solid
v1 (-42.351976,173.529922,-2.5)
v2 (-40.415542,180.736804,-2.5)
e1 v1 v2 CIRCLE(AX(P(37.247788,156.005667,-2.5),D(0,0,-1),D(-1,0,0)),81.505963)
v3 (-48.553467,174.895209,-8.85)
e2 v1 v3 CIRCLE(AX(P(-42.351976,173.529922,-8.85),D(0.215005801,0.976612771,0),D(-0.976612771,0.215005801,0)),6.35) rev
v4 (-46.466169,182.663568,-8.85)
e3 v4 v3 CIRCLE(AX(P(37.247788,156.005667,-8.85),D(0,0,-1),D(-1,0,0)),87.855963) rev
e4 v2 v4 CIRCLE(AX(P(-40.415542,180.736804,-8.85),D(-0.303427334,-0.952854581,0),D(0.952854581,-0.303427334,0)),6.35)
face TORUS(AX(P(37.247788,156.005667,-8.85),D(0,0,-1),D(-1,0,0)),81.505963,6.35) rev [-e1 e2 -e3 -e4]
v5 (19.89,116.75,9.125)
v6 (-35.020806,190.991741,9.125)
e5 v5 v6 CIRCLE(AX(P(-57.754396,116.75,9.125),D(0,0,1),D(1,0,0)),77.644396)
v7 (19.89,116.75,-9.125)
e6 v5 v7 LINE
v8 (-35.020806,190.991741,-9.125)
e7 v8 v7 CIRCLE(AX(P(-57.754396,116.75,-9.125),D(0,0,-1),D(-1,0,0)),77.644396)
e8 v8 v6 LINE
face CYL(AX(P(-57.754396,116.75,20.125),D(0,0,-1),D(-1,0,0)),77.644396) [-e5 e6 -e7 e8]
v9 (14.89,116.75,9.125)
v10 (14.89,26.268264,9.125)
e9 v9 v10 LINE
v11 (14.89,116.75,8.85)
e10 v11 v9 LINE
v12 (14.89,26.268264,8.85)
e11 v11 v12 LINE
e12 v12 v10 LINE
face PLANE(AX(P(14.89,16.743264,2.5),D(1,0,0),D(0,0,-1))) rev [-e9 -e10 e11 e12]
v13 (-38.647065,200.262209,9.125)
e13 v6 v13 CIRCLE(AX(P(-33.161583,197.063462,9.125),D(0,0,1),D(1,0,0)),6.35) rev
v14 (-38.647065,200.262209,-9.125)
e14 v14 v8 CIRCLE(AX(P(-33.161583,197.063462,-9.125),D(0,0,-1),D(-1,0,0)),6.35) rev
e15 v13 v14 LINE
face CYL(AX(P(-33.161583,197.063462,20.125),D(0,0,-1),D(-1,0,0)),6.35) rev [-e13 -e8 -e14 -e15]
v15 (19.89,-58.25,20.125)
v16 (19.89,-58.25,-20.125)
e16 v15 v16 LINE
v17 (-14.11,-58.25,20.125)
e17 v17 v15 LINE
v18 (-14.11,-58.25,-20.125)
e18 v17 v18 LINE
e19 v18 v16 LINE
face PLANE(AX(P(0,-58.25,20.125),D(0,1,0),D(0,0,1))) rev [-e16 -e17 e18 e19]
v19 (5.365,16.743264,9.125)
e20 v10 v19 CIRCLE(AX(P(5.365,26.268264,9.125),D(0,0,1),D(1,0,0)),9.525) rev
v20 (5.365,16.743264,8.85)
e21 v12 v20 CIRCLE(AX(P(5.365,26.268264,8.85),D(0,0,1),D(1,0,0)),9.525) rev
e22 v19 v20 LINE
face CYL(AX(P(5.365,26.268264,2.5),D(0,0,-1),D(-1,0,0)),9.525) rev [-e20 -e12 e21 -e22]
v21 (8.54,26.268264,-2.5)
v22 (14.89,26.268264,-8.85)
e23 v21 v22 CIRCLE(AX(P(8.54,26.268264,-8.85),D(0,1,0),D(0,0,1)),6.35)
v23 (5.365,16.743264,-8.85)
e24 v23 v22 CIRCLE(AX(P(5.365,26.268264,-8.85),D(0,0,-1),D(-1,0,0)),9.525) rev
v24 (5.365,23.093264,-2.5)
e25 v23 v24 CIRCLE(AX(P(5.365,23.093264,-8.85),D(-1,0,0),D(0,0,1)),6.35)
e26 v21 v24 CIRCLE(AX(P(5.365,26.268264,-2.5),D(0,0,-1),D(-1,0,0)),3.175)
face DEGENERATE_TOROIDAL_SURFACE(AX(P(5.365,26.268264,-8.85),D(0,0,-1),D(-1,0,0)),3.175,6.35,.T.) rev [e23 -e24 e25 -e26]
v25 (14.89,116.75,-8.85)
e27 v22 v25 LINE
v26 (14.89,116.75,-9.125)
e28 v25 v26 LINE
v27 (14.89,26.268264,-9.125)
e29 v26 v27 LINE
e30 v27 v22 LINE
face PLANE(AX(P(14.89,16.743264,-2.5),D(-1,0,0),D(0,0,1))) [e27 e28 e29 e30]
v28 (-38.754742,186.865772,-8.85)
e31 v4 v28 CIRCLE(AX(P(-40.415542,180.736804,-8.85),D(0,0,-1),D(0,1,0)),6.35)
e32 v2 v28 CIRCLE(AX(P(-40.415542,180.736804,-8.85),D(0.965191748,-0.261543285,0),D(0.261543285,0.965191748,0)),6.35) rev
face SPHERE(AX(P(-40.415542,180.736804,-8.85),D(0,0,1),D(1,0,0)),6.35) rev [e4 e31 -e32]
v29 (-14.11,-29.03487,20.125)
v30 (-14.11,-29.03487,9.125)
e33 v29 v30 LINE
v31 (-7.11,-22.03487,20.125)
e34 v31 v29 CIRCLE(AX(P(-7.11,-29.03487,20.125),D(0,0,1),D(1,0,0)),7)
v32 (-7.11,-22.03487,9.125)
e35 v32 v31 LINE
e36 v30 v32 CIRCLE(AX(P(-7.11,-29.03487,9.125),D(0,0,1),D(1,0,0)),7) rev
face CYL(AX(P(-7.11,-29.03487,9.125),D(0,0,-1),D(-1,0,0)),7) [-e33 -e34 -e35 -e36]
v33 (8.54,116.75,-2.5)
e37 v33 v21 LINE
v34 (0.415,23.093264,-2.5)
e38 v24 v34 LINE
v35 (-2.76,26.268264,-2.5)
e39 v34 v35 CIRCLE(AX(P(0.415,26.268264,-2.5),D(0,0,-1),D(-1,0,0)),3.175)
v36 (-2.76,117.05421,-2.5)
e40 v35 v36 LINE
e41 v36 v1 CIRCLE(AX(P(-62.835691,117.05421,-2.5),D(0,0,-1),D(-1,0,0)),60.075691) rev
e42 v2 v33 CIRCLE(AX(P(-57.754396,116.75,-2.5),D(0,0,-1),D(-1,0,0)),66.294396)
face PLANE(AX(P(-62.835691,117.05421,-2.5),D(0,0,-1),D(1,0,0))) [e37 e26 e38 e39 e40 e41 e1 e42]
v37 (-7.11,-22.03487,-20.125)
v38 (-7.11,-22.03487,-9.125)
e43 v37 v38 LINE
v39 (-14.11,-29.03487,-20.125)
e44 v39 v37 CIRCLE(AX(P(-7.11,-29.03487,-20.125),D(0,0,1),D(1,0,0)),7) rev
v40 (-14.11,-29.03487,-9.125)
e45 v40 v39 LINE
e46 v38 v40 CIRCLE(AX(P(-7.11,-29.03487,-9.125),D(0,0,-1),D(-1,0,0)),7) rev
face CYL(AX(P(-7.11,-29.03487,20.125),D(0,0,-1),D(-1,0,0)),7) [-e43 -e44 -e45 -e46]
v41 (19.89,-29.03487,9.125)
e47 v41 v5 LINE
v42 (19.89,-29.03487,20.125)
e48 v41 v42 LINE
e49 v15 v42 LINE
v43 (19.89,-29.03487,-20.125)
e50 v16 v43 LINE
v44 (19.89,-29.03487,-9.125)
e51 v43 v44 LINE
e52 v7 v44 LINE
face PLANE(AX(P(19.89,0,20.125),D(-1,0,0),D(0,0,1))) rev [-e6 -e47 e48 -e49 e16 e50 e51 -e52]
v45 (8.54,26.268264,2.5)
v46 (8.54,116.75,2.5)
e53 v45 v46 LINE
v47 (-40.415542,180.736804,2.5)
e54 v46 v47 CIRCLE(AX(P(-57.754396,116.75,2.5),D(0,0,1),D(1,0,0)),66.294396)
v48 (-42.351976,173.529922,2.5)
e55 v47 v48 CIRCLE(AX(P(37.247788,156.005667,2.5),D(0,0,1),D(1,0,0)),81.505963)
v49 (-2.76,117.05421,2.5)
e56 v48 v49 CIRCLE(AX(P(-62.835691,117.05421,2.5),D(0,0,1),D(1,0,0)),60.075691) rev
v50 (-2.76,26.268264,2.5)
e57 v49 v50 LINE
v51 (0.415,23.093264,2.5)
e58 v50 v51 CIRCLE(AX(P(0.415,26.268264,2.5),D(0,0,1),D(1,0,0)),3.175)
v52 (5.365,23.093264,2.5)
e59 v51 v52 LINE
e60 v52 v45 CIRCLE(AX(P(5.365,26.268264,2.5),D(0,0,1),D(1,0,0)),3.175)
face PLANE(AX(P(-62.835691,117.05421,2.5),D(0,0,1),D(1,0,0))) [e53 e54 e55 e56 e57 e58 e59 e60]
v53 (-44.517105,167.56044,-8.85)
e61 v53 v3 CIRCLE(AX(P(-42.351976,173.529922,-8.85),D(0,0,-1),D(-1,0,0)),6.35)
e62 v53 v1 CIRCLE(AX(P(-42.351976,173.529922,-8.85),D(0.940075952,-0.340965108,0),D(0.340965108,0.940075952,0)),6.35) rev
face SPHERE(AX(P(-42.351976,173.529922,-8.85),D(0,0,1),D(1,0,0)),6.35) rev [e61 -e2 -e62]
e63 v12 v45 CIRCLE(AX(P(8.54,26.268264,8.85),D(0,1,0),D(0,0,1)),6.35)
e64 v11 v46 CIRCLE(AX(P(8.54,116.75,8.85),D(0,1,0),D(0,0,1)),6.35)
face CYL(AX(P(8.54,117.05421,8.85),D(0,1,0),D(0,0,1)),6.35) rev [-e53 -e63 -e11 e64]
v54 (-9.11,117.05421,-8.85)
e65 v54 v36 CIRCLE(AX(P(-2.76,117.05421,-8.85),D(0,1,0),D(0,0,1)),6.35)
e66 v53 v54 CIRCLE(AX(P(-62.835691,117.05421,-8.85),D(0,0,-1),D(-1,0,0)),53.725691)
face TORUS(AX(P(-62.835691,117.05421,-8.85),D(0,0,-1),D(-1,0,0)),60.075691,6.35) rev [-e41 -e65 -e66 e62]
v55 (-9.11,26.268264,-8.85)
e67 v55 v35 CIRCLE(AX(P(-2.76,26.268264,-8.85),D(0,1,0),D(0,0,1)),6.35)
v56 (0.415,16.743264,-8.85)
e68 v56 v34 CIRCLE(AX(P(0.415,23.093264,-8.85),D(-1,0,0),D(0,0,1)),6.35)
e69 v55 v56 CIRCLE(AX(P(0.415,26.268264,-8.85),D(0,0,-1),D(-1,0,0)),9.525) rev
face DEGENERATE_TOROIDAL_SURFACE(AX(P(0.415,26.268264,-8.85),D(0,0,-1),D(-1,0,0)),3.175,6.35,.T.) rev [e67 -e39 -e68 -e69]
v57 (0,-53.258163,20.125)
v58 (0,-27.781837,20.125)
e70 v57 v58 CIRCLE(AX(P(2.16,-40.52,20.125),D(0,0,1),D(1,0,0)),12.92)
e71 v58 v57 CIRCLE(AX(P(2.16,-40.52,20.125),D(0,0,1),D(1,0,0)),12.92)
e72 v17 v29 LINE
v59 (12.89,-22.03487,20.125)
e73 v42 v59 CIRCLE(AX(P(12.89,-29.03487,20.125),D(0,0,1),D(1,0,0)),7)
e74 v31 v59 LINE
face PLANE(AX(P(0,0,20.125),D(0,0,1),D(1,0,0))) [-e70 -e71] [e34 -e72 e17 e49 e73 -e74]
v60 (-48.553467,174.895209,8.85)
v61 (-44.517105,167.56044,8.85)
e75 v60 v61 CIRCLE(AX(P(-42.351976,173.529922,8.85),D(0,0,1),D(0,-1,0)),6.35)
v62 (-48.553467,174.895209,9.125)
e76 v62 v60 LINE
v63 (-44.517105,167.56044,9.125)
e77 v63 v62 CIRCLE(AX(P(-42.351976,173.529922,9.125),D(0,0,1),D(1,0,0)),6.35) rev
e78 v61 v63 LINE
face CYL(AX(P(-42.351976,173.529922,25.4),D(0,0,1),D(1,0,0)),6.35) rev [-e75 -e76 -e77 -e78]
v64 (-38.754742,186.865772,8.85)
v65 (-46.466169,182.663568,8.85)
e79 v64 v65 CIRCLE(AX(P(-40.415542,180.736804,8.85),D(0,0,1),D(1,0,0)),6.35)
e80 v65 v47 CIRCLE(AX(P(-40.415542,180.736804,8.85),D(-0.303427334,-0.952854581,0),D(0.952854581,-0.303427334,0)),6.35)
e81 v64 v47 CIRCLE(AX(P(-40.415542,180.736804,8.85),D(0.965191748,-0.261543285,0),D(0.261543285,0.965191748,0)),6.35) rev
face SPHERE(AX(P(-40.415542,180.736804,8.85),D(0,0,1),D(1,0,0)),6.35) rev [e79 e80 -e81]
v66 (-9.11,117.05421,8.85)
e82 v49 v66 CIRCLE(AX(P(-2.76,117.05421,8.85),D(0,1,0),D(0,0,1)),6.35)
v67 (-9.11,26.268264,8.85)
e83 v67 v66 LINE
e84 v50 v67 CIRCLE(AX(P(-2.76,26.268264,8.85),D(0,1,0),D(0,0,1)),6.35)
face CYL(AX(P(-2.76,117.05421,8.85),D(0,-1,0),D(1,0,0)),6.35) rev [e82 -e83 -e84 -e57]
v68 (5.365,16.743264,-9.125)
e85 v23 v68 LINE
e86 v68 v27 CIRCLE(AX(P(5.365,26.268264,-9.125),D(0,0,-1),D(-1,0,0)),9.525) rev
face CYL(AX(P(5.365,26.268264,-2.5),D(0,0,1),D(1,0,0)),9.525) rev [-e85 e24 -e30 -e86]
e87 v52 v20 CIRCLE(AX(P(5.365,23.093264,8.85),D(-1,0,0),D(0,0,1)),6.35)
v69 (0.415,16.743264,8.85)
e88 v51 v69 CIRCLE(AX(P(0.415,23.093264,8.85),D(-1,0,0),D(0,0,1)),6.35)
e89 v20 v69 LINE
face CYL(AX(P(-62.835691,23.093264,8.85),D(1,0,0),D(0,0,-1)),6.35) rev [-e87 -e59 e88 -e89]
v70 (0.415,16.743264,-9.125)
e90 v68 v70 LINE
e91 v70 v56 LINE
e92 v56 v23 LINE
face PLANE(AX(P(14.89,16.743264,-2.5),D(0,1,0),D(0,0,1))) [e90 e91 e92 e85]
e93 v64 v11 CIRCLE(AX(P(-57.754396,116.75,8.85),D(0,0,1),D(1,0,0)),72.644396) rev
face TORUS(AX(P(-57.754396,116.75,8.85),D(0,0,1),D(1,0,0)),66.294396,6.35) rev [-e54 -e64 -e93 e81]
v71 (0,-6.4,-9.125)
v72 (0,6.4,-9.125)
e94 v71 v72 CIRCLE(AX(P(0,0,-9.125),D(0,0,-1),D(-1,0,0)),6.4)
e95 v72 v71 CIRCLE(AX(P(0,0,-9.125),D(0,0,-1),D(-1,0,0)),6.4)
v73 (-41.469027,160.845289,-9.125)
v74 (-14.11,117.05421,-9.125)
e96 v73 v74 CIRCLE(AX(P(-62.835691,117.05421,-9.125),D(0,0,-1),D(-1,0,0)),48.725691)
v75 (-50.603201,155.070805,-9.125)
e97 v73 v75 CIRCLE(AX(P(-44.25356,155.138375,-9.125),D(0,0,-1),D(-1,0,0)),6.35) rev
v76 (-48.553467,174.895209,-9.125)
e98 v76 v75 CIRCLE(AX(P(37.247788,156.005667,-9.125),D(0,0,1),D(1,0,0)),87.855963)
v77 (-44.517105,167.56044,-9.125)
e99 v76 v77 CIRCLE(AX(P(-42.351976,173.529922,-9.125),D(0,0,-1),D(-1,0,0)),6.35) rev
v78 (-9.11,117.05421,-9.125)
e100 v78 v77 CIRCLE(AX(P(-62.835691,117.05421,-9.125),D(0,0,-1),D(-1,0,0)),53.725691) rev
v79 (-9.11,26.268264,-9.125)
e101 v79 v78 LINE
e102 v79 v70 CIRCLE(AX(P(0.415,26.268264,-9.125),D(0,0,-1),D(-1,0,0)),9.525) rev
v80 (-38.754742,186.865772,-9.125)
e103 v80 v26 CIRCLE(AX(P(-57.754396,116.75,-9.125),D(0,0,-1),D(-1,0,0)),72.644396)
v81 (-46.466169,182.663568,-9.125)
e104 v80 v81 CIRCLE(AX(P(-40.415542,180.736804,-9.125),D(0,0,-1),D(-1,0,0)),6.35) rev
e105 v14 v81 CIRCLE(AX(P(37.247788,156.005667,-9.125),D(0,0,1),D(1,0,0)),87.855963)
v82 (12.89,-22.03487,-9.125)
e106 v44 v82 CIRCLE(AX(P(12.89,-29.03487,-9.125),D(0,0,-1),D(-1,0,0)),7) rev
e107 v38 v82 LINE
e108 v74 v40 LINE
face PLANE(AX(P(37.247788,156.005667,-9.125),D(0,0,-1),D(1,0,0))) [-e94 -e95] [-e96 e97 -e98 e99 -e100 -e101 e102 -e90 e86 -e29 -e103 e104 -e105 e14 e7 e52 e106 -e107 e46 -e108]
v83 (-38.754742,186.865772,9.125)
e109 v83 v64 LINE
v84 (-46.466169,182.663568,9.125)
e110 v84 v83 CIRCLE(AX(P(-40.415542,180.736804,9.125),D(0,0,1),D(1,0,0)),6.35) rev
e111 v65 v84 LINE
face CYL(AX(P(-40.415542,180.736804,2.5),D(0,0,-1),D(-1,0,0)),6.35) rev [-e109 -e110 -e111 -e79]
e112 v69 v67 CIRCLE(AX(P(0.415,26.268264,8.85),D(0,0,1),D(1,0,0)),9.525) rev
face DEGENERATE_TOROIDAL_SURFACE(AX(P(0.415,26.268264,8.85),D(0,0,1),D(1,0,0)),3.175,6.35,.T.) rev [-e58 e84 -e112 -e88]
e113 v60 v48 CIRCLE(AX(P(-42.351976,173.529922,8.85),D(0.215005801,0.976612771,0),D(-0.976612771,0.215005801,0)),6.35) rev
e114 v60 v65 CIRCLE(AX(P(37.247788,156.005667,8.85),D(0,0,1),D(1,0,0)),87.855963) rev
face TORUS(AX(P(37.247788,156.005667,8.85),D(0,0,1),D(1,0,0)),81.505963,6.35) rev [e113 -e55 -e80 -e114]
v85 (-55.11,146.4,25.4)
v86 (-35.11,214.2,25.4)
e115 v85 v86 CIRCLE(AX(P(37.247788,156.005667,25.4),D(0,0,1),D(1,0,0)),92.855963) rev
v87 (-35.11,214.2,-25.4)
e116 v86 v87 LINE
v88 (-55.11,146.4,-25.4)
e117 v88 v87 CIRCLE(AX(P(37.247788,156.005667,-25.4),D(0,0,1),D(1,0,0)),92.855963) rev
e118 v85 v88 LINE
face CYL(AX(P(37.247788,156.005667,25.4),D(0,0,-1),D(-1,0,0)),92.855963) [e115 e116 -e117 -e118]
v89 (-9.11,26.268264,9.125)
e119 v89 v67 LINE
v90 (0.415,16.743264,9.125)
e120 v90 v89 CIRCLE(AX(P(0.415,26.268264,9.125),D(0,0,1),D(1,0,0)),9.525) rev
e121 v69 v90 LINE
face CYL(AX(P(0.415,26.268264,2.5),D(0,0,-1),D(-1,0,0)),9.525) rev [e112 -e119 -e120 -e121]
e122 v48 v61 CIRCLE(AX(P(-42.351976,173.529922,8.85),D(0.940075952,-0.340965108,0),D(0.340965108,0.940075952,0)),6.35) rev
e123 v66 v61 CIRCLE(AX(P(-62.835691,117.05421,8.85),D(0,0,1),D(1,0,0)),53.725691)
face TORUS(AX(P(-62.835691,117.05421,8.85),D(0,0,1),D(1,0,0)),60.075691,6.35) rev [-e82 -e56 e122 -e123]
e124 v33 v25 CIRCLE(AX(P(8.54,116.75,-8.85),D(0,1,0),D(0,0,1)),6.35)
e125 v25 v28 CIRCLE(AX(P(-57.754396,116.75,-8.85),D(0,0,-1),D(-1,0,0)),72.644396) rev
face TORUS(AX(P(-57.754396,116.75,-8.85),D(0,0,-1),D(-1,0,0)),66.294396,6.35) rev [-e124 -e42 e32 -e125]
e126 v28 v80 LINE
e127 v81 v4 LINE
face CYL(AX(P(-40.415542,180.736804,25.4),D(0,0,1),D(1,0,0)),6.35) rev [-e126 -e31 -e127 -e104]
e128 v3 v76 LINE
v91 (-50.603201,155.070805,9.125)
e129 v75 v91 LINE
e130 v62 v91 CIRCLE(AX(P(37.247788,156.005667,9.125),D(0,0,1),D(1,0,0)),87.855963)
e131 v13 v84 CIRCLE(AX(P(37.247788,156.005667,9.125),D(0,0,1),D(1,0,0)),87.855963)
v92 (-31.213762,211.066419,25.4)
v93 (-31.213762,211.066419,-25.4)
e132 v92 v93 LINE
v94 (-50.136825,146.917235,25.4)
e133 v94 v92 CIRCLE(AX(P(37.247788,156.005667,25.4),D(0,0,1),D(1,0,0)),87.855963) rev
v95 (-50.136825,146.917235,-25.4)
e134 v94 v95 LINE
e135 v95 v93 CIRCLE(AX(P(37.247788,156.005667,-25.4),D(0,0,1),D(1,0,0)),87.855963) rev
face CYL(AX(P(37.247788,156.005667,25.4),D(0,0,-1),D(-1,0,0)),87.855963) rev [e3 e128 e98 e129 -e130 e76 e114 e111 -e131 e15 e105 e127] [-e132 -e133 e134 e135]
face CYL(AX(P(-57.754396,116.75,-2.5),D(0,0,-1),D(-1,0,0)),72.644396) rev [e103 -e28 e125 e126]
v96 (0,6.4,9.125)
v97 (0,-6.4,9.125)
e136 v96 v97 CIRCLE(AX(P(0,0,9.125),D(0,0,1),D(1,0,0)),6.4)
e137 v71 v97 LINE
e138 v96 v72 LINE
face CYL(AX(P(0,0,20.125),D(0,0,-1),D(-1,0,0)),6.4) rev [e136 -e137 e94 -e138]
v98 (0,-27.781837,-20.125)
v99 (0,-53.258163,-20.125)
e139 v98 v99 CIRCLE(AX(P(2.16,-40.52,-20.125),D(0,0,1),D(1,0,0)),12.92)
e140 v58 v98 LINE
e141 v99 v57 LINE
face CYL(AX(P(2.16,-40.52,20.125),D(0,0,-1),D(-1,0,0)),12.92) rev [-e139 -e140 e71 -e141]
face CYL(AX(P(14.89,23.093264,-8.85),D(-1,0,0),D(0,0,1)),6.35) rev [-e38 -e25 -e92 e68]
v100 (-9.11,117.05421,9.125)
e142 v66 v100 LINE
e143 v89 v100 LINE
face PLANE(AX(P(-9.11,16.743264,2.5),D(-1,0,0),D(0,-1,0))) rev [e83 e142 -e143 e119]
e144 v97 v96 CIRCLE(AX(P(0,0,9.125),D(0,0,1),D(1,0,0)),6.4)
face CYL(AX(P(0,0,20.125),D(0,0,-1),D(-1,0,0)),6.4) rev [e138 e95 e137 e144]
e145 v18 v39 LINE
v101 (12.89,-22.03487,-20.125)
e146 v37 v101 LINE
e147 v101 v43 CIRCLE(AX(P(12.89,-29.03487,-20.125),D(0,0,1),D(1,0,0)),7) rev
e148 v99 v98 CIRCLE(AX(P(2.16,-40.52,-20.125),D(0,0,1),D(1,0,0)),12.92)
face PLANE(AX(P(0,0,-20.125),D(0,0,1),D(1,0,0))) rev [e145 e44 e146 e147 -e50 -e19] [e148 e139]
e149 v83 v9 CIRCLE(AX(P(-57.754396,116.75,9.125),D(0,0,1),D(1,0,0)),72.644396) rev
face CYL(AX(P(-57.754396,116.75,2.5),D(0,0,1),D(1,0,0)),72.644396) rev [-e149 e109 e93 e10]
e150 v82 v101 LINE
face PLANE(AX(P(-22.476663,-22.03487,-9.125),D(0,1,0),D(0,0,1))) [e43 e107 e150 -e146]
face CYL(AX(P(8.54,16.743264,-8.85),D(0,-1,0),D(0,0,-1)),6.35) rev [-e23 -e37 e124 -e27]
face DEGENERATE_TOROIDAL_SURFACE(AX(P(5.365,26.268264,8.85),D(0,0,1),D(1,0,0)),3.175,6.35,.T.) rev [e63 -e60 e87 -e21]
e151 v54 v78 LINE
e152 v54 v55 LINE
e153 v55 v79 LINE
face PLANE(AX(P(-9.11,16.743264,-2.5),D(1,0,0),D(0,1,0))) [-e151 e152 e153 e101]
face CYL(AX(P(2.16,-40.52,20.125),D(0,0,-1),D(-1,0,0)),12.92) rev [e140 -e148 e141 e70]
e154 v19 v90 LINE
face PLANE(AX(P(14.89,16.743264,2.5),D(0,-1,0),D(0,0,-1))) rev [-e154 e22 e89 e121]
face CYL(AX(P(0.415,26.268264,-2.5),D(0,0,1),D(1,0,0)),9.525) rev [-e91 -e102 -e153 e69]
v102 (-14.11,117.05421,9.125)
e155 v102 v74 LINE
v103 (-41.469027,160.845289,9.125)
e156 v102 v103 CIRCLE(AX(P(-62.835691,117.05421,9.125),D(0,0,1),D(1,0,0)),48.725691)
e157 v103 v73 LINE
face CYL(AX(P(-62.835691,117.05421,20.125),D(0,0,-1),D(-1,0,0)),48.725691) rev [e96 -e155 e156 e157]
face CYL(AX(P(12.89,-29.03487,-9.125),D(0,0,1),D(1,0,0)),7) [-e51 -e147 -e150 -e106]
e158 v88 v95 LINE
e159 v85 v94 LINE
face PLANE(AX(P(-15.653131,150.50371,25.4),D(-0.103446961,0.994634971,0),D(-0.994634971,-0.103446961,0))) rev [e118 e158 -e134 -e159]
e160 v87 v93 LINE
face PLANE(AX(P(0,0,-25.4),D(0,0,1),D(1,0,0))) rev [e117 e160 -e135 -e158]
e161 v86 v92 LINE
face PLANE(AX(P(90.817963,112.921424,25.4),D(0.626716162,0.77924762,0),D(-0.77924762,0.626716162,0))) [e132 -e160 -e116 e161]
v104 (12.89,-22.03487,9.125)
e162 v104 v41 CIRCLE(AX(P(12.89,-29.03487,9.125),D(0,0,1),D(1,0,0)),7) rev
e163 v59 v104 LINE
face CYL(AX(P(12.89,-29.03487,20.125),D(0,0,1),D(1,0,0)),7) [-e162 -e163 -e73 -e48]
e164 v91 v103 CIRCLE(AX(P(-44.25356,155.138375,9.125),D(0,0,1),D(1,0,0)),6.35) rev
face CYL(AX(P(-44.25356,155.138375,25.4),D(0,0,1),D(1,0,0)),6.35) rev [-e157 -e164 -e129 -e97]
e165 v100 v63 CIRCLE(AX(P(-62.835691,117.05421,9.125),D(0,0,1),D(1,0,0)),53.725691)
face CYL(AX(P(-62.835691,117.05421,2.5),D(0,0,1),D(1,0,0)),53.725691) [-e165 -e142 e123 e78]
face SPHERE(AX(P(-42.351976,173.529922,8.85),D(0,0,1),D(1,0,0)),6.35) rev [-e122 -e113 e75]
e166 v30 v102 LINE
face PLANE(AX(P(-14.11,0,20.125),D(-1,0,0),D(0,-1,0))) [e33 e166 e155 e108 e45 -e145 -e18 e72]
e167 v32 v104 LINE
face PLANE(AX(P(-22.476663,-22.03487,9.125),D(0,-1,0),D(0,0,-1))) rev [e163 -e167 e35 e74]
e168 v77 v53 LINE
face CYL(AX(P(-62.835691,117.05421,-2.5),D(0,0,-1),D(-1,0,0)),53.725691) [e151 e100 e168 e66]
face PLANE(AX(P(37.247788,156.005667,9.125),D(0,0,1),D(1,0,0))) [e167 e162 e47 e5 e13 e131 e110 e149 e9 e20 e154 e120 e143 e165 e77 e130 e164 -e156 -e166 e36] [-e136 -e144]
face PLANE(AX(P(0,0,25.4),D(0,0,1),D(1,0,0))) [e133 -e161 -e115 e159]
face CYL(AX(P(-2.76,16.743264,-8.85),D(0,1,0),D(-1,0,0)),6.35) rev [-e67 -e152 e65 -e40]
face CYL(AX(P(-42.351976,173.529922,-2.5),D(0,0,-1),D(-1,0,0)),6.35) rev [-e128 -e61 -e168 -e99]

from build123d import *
from build123d.topology import SkipClean

# Parameters (mm, degrees)
SKETCH2_R               = 6.3999999999999995
SKETCH2_R_2             = 12.920000000000002
BOSS_EXTRUDE1_DEPTH     = 20.125
BOSS_EXTRUDE2_DEPTH     = 25.4
CUT_EXTRUDE1_DEPTH      = 17.625
FILLET2_R               = 9.525
FILLET1_R               = 6.35
FILLET2_OF_MIRROR1_R    = 9.525
FILLET1_OF_MIRROR1_R    = 6.35
CUT_EXTRUDE3_REACH      = 230.532
CUT_EXTRUDE3_END_RADIUS = 87.85596312436087
CUT_EXTRUDE4_DEPTH      = 34
FILLET3_R               = 6.35
CUT_EXTRUDE6_DEPTH      = 11
FILLET4_R               = 7


with BuildPart() as part:
    # Sketch2 → Boss-Extrude1 (new, symmetric)
    with BuildSketch(Plane.XY):
        with BuildLine():
            Line((-14.110000000000005, 117.05420999809479), (-14.110000000000003, 39.41472795492869))
            Line((-14.110000000000003, 39.41472795492869), (-14.109999999999992, -58.249999999999986))
            Line((-14.109999999999992, -58.24999999999999), (19.890000000000008, -58.24999999999999))
            Line((19.89000000000001, -58.24999999999999), (19.89000000000001, 39.414727954928686))
            Line((19.89000000000001, 39.41472795492869), (19.89000000000001, 116.74999999999999))
            ThreePointArc((19.890000000000022, 116.74999999999999), (2.3016026864285166, 165.96310053609741), (-42.49516565662927, 192.88020532941604))
            ThreePointArc((-42.49516565662924, 192.88020532941601), (-47.59126491681772, 178.8312081202326), (-50.2324931256602, 164.12173961174625))
            ThreePointArc((-50.23249312566025, 164.12173961174625), (-24.181503081041093, 146.71979128999487), (-14.110000000000007, 117.05420999809479))
        make_face()
        Circle(SKETCH2_R, mode=Mode.SUBTRACT)
        with Locations((2.160000000000005, -40.52)):
            Circle(SKETCH2_R_2, mode=Mode.SUBTRACT)
    extrude(amount=BOSS_EXTRUDE1_DEPTH, both=True)

    # Sketch2<3> → Boss-Extrude2 (add, symmetric)
    with BuildSketch(Plane.XY):
        with BuildLine():
            Line((-55.11000000000002, 146.4), (-50.13682514315135, 146.9172348047148))
            ThreePointArc((-50.13682514315135, 146.9172348047148), (-47.01837422138325, 180.86294224819565), (-31.213761902356293, 211.06641919101017))
            Line((-31.213761902356293, 211.06641919101017), (-35.11000000000003, 214.2))
            ThreePointArc((-35.11000000000003, 214.2), (-51.814073878435075, 182.27760291399264), (-55.11000000000002, 146.4))
        make_face()
    extrude(amount=BOSS_EXTRUDE2_DEPTH, both=True)

    # Sketch3 → Cut-Extrude1 (cut)
    with BuildSketch(Plane.XY.offset(20.125)):
        with BuildLine():
            Line((-9.109999999999992, 16.74326446705436), (-9.110000000000003, 117.05420999809479))
            ThreePointArc((-9.110000000000003, 117.05420999809479), (-20.430838112311193, 150.0432736077851), (-49.62239933784868, 169.12972028140788))
            ThreePointArc((-49.62239933784868, 169.12972028140788), (-47.60047450986274, 178.79694990145757), (-44.50629280792827, 188.17615819065796))
            ThreePointArc((-44.50629280792827, 188.17615819065796), (-1.899187077854016, 163.1978623652425), (14.890000000000011, 116.74999999999999))
            Line((14.890000000000011, 116.74999999999999), (14.890000000000011, 16.74326446705436))
            Line((14.890000000000011, 16.74326446705436), (-9.109999999999992, 16.74326446705436))
        make_face()
    cut_extrude1 = extrude(amount=-CUT_EXTRUDE1_DEPTH, mode=Mode.SUBTRACT)

    # Fillet2
    fillet2_edges = [part.edges().sort_by_distance(p)[0] for p in [
        (14.890000000000011, 16.74326446705436, 11.3125),
        (-9.109999999999992, 16.74326446705436, 11.3125),
    ]]
    fillet(fillet2_edges, radius=FILLET2_R)

    # Fillet1
    fillet1_edges = [part.edges().sort_by_distance(p)[0] for p in [
        (-20.430838112311193, 150.0432736077851, 2.5),
        (-47.600474509862764, 178.79694990145757, 2.5),
        (-49.62239933784869, 169.12972028140788, 11.3125),
        (-1.8991870778540232, 163.1978623652425, 2.5),
        (-44.506292807928276, 188.17615819065796, 11.3125),
        (-9.109999999999998, 71.66123723257456, 2.5),
        (2.8900000000000112, 16.74326446705436, 2.5),
        (14.890000000000011, 71.50913223352717, 2.5),
        (12.100192090801878, 19.53307237625249, 2.5),
        (-6.32019209080186, 19.53307237625249, 2.5),
    ]]
    fillet(fillet1_edges, radius=FILLET1_R)

    # Mirror1: Cut-Extrude1 across plane
    add(cut_extrude1.mirror(Plane.XY), mode=Mode.SUBTRACT)

    # Fillet2 of Mirror1
    fillet2_of_mirror1_edges = [part.edges().sort_by_distance(p)[0] for p in [
        (14.890000000000011, 16.74326446705436, -11.3125),
        (-9.109999999999992, 16.74326446705436, -11.3125),
    ]]
    fillet(fillet2_of_mirror1_edges, radius=FILLET2_OF_MIRROR1_R)

    # Fillet1 of Mirror1
    fillet1_of_mirror1_edges = [part.edges().sort_by_distance(p)[0] for p in [
        (-20.430838112311193, 150.0432736077851, -2.5),
        (-47.600474509862764, 178.79694990145757, -2.5),
        (-49.62239933784869, 169.12972028140788, -11.3125),
        (-1.8991870778540232, 163.1978623652425, -2.5),
        (-44.506292807928276, 188.17615819065796, -11.3125),
        (-9.109999999999998, 71.66123723257456, -2.5),
        (2.8900000000000112, 16.74326446705436, -2.5),
        (14.890000000000011, 71.50913223352717, -2.5),
        (12.100192090801878, 19.53307237625249, -2.5),
        (-6.32019209080186, 19.53307237625249, -2.5),
    ]]
    fillet(fillet1_of_mirror1_edges, radius=FILLET1_OF_MIRROR1_R)

    # Cut-Extrude3: up to this cylinder (the profile starts inside it)
    with SkipClean():  # the faces are left unmerged after this step: merging them gives an invalid solid
        cut_extrude3_end = Plane(origin=(37.24778822370744, 156.0056671906468, 17.416667), z_dir=(0, 0, -1)) * Cylinder(CUT_EXTRUDE3_END_RADIUS, 637.7759262487218, mode=Mode.PRIVATE)
        # Sketch5 → Cut-Extrude3 (cut, up to the surface)
        with BuildSketch(Plane(origin=(19.89000000000001, 0, 0), x_dir=(0, 0, -1), z_dir=(1, 0, 0)), mode=Mode.PRIVATE) as cut_extrude3_sk1:
            Polygon((-20.125, 29.25), (-12, 192.88020532941607), (-20.125, 192.88020532941607), align=None)
        cut_extrude3_tool1 = extrude(cut_extrude3_sk1.sketch, amount=-CUT_EXTRUDE3_REACH, mode=Mode.PRIVATE) & cut_extrude3_end
        cut_extrude3 = cut_extrude3_tool1.solids().sort_by_distance((19.89, 138.336804, 17.416667))[0]
        add(cut_extrude3, mode=Mode.SUBTRACT)

    # Sketch5<2> → Cut-Extrude4 (cut)
    with SkipClean():  # the faces are left unmerged after this step: merging them gives an invalid solid
        with BuildSketch(Plane(origin=(19.89000000000001, 0, 0), x_dir=(0, 0, -1), z_dir=(1, 0, 0))):
            Polygon((-20.125, 29.25), (-12, 192.88020532941607), (-20.125, 192.88020532941607), align=None)
        cut_extrude4 = extrude(amount=-CUT_EXTRUDE4_DEPTH, mode=Mode.SUBTRACT)

    # Mirror3: Cut-Extrude3, Cut-Extrude4 across plane
    with SkipClean():  # the faces are left unmerged after this step: merging them gives an invalid solid
        add(cut_extrude3.mirror(Plane.XY), mode=Mode.SUBTRACT)
        add(cut_extrude4.mirror(Plane.XY), mode=Mode.SUBTRACT)

    # Fillet3
    # the kernel refuses this fillet: 6.35 mm, written as the material it adds along each edge
    with BuildSketch(Plane(origin=(-42.49516565662923, 192.88020532941607, 32.81193482848439), x_dir=(0.9695328883801022, -0.24496117722883434, 0), z_dir=(0, 0, -1))) as fillet3_piece_1_section:
        with BuildLine():
            CenterArc((8.024480114111293, -6.3421701367020615), FILLET3_R, 92.84559109505132, 103.22260019601504)
            ThreePointArc((1.922555805727569, -8.099730871002809), (0.8652879633419357, -4.072649651231302), (0, 0))
            ThreePointArc((0, 0), (3.854618709259254, -0.0957393715417783), (7.709237418518542, 1.1e-16))
        make_face()
    fillet3_piece_1 = extrude(amount=65.62386965696876, mode=Mode.PRIVATE)
    fillet3_piece_1 = split(fillet3_piece_1, bisect_by=Plane(origin=(-39.886829020293874, 194.82853980671922, 11.903256140293786), z_dir=(0, -0.04959354560053897, -0.9987694830313786)), keep=Keep.TOP, mode=Mode.PRIVATE)
    fillet3_piece_1 = split(fillet3_piece_1, bisect_by=Plane(origin=(-39.886829020293874, 194.82853980671922, -11.903256140293786), z_dir=(0, -0.04959354560053897, 0.9987694830313786)), keep=Keep.TOP, mode=Mode.PRIVATE)
    add(fillet3_piece_1)
    with BuildSketch(Plane(origin=(-50.2324931256602, 164.12173961174625, -36.817821832007795), x_dir=(0.9366748288378645, -0.3502003212756337, 0), z_dir=(0, 0, 1))) as fillet3_piece_2_section:
        with BuildLine():
            CenterArc((8.74629308675495, -6.320667702743433), FILLET3_R, 84.49076719702147, 116.61848813582492)
            ThreePointArc((2.822407485998928, -8.607604385110362), (1.3001924139031467, -4.340202472151455), (0, 0))
            ThreePointArc((0, 0), (4.6779660766656175, 0.2250766052239502), (9.355932153331263, 2.8e-16))
        make_face()
    fillet3_piece_2 = extrude(amount=73.63564366401559, mode=Mode.PRIVATE)
    fillet3_piece_2 = split(fillet3_piece_2, bisect_by=Plane(origin=(-48.29188317260997, 162.0247617991737, 13.532116140650901), z_dir=(0, -0.04959354560053897, -0.9987694830313786)), keep=Keep.TOP, mode=Mode.PRIVATE)
    fillet3_piece_2 = split(fillet3_piece_2, bisect_by=Plane(origin=(-48.29188317260997, 162.02476179917375, -13.5321161406509), z_dir=(0, -0.04959354560053897, 0.9987694830313786)), keep=Keep.TOP, mode=Mode.PRIVATE)
    add(fillet3_piece_2)

    # Sketch7 → Cut-Extrude6 (cut)
    with SkipClean():  # the faces are left unmerged after this step: merging them gives an invalid solid
        with BuildSketch(Plane.XY.offset(20.125)):
            with BuildLine():
                Line((-22.47666315598992, -22.034869971016057), (33.32085672898189, -22.034869971016057))
                Line((33.32085672898189, -22.034869971016057), (33.32085672898189, 196.87887338600035))
                Line((33.32085672898189, 196.87887338600035), (-31.213761902356293, 211.06641919101017))
                ThreePointArc((-31.213761902356293, 211.06641919101017), (-47.01837422138329, 180.8629422481957), (-50.13682514315135, 146.9172348047148))
                Line((-50.13682514315135, 146.9172348047148), (-22.47666315598992, -22.034869971016057))
            make_face()
        cut_extrude6 = extrude(amount=-CUT_EXTRUDE6_DEPTH, mode=Mode.SUBTRACT)

    # Mirror4: Cut-Extrude6 across plane
    with SkipClean():  # the faces are left unmerged after this step: merging them gives an invalid solid
        add(cut_extrude6.mirror(Plane.XY), mode=Mode.SUBTRACT)

    # Fillet4
    fillet4_edges = [part.edges().sort_by_distance(p)[0] for p in [
        (-14.110000000000001, -22.03486997101606, 14.625),
        (19.89000000000001, -22.034869971016057, 14.625),
        (19.89000000000001, -22.034869971016057, -14.625),
        (-14.110000000000001, -22.03486997101606, -14.625),
    ]]
    fillet(fillet4_edges, radius=FILLET4_R)


solid = part.part
